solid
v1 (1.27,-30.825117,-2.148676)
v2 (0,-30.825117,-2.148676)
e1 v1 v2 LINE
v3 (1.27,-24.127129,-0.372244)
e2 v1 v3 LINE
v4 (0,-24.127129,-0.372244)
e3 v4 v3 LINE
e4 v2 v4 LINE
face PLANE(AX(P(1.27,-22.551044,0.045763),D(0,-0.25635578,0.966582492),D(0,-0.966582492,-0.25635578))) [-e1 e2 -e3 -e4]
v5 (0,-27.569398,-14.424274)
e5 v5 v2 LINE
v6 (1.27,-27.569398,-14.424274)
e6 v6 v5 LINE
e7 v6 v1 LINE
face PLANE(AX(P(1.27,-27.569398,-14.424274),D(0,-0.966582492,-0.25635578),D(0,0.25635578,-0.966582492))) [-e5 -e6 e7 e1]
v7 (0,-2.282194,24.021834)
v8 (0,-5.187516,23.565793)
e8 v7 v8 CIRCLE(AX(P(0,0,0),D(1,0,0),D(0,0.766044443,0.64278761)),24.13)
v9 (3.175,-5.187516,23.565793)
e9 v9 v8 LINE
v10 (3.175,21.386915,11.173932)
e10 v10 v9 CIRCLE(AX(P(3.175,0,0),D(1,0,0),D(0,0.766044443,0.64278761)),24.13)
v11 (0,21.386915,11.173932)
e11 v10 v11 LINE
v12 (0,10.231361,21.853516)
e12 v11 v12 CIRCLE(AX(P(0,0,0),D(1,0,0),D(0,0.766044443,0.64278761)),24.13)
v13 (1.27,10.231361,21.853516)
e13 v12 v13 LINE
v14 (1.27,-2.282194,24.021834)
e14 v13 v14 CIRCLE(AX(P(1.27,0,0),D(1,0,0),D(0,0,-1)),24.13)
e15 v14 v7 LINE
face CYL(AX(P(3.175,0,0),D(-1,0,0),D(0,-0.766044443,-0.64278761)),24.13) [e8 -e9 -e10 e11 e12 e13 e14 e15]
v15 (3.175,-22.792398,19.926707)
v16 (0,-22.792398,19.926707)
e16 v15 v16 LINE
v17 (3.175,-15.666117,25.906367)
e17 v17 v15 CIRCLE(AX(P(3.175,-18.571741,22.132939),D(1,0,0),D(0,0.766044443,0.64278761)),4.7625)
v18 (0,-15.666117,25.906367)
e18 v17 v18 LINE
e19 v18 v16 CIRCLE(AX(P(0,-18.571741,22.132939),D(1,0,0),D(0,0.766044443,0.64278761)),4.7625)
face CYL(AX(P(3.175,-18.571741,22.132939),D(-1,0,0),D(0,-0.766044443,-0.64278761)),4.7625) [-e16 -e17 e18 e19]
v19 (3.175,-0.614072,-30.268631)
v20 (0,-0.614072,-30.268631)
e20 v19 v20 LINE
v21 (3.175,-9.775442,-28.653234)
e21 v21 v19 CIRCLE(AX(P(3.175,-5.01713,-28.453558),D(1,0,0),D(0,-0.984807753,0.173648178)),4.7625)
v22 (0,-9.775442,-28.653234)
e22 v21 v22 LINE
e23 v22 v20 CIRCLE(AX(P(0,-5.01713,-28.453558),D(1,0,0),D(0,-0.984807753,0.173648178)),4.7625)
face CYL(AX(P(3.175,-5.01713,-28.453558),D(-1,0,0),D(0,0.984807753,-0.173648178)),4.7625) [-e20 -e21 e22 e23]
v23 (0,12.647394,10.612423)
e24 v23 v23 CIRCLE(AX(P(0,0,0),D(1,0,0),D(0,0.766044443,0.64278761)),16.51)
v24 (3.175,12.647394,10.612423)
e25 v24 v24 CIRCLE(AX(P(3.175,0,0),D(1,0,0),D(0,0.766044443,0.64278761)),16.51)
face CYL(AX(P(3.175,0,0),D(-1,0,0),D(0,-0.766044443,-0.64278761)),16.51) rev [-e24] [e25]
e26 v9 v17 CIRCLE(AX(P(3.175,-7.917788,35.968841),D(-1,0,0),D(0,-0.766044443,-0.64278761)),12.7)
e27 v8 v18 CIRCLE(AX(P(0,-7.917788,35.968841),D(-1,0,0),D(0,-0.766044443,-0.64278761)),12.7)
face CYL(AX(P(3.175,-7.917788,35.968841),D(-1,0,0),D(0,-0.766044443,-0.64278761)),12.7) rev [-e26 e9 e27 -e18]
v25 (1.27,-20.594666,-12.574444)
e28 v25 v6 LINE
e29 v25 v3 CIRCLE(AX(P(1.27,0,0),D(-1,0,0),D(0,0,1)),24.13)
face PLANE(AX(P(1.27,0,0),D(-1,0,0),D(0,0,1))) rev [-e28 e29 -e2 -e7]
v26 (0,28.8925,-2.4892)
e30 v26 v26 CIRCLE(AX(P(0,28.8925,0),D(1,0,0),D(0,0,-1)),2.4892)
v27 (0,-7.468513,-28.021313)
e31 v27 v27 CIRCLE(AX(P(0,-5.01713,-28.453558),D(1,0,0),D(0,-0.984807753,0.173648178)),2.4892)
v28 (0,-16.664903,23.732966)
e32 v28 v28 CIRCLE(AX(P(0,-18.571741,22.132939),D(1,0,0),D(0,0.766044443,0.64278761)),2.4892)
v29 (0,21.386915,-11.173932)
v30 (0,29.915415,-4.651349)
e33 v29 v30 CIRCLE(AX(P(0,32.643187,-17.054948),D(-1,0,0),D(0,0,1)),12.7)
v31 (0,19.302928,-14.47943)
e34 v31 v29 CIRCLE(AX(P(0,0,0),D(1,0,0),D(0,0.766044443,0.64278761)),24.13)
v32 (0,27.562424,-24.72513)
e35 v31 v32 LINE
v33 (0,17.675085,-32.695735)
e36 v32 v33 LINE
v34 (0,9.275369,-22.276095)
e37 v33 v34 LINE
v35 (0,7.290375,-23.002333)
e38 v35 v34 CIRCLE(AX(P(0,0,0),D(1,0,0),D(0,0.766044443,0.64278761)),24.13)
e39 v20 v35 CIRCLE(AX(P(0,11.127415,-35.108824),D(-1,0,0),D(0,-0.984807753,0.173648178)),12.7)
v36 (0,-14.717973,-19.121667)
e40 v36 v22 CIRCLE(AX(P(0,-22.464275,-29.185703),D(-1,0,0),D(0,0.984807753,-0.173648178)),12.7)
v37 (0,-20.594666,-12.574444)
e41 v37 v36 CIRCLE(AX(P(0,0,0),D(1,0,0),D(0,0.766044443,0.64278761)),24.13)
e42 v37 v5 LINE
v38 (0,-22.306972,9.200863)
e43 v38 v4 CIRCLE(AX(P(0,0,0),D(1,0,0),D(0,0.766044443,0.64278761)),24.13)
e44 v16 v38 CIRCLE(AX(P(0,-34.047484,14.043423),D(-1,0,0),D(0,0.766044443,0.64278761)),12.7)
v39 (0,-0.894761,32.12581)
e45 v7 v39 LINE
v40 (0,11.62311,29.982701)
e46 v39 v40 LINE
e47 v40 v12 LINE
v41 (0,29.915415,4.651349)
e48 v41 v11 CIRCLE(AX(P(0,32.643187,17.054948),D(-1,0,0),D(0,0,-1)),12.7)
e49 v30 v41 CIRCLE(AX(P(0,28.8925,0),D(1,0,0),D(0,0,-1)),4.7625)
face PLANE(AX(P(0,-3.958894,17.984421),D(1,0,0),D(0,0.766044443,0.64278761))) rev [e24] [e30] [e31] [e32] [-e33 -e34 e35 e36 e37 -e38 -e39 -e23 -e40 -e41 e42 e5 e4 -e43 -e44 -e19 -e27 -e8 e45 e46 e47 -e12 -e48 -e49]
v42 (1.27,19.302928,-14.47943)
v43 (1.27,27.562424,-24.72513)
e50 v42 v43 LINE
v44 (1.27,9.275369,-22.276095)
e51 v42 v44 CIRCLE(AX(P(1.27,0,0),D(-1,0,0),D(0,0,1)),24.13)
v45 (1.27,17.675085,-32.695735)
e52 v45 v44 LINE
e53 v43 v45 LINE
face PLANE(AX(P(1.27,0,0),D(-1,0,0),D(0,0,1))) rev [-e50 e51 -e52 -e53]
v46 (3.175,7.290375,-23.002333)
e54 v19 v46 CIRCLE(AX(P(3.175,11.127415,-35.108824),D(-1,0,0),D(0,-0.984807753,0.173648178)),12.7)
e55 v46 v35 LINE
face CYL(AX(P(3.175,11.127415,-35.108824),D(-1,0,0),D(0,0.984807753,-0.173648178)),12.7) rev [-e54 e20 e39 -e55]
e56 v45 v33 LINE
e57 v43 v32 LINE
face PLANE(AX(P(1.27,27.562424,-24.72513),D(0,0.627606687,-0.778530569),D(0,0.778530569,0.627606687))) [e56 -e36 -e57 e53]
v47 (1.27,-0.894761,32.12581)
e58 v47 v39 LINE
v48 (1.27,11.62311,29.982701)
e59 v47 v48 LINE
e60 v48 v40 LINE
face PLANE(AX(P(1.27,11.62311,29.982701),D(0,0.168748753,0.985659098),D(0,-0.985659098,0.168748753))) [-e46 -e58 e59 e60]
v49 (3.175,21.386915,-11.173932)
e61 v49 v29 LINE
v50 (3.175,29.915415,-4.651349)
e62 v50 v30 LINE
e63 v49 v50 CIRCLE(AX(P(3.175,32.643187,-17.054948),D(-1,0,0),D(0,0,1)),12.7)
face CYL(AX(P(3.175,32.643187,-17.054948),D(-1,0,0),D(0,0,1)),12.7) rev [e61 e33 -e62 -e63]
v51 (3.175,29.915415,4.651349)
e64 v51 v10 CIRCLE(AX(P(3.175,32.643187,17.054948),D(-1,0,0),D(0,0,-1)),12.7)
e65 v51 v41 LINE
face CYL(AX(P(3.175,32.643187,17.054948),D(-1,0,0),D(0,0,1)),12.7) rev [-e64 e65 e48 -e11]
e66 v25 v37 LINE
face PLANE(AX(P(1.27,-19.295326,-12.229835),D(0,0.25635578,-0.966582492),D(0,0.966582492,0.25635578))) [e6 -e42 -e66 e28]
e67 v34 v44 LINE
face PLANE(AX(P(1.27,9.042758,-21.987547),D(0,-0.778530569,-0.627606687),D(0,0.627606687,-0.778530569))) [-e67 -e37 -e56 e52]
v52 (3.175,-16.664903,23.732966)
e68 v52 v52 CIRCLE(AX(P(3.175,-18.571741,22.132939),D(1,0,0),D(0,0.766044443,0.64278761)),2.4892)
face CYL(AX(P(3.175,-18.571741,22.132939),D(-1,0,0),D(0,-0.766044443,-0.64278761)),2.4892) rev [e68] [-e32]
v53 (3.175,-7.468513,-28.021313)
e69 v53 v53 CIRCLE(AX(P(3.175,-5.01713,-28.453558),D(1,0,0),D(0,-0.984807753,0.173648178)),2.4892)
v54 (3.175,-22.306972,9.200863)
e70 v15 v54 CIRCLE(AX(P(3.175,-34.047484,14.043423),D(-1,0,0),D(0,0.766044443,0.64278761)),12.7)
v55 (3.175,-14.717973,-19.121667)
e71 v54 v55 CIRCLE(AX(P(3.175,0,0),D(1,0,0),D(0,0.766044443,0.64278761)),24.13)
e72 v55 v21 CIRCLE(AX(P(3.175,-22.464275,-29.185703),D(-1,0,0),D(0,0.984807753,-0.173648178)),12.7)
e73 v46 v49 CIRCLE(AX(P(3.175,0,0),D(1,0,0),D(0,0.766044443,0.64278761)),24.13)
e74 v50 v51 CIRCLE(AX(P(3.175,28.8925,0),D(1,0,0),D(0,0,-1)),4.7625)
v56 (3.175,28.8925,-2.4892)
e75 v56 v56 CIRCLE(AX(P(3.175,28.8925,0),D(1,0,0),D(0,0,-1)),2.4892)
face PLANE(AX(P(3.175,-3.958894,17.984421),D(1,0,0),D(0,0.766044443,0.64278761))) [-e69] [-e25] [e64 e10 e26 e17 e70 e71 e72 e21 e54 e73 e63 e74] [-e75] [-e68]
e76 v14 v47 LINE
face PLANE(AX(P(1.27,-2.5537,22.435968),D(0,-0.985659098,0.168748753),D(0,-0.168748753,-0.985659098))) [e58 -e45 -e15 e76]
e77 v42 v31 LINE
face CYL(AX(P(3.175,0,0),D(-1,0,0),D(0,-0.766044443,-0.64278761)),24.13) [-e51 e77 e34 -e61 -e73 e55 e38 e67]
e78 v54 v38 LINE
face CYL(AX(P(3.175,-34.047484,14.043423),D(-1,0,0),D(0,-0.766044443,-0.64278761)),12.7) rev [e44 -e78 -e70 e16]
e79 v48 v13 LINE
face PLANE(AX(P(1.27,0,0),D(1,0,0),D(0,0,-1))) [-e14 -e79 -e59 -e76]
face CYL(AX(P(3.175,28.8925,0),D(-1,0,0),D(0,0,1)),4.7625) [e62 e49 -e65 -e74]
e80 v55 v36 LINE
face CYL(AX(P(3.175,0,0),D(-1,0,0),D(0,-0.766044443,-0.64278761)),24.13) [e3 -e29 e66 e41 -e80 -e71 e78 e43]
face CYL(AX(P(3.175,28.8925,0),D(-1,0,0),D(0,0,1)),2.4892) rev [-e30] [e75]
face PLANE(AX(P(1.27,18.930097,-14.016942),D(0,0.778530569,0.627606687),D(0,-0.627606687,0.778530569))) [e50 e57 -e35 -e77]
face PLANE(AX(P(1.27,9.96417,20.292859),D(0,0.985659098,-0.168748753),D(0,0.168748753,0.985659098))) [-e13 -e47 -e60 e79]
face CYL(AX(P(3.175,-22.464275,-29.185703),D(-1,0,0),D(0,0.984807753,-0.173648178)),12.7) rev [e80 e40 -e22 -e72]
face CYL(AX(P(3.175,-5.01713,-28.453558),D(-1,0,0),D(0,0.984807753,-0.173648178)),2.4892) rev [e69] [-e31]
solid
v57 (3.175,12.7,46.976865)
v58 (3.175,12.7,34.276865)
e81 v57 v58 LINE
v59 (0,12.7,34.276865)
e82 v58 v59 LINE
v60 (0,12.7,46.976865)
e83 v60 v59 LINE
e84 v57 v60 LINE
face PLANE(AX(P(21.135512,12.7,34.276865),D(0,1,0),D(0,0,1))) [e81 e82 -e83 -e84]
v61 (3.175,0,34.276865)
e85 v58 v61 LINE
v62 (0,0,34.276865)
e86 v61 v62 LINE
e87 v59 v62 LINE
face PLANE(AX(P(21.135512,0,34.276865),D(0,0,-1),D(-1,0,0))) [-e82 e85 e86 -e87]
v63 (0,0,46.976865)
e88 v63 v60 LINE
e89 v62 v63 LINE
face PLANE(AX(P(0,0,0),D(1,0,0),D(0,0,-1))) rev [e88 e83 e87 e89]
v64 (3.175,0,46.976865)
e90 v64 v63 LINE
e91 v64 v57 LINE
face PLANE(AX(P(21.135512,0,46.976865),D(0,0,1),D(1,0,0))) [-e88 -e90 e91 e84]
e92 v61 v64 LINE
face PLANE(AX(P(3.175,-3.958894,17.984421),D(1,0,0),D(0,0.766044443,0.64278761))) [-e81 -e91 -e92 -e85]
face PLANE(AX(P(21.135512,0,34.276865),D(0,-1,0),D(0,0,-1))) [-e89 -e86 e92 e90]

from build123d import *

# Parameters (mm, degrees)
SKETCH1_R           = 16.51
SKETCH1_R_2         = 2.4892
BOSS_EXTRUDE1_DEPTH = 3.175
CIRPATTERN1_COUNT   = 3
CIRPATTERN1_ANGLE   = 260
SKETCH2_W           = 12.7
SKETCH2_H           = 12.7
BOSS_EXTRUDE2_DEPTH = 3.175
BOSS_EXTRUDE3_DEPTH = 1.27


with BuildPart() as part:
    # Sketch1 → Boss-Extrude1 (new body)
    with BuildSketch(Plane(origin=(0, 0, 0), x_dir=(0, 0, -1), z_dir=(1, 0, 0))):
        with BuildLine():
            ThreePointArc((4.651349482, 29.915414585), (0, 33.655), (-4.651349482, 29.915414585))
            ThreePointArc((-4.651349482, 29.915414585), (-6.967053747, 24.927981855), (-11.173931514, 21.386915498))
            ThreePointArc((-11.173931514, 21.386915498), (0, -24.13), (11.173931514, 21.386915498))
            ThreePointArc((11.173931514, 21.386915498), (6.967053747, 24.927981855), (4.651349482, 29.915414585))
        make_face()
        Circle(SKETCH1_R, mode=Mode.SUBTRACT)
        with Locations((0, 28.8925)):
            Circle(SKETCH1_R_2, mode=Mode.SUBTRACT)
    extrude(amount=BOSS_EXTRUDE1_DEPTH)


with BuildPart() as cirpattern1_1:
    # CirPattern1: pattern copy
    add(part.part.rotate(Axis((0, 0, 0), (1, 0, 0)), 1 * CIRPATTERN1_ANGLE / (CIRPATTERN1_COUNT - 1)))


with BuildPart() as cirpattern1_2:
    # CirPattern1: pattern copy
    add(part.part.rotate(Axis((0, 0, 0), (1, 0, 0)), 2 * CIRPATTERN1_ANGLE / (CIRPATTERN1_COUNT - 1)))


with BuildPart() as part_1:
    add(part.part)

    # Combine1: read off the stored shape, not the designer's step
    # Combine1: union CirPattern1_2, CirPattern1_1
    add(cirpattern1_2.part)
    add(cirpattern1_1.part)

    # Sketch3 → Boss-Extrude3 (add)
    with BuildSketch(Plane.ZY):
        Polygon((-14.016942068, 18.930096526), (-21.987546991, 9.042758303), (-32.695735298, 17.675085478), (-24.725130374, 27.562423702), align=None)
        Polygon((20.292858755, 9.964170469), (22.435967923, -2.55370008), (32.12580998, -0.894760626), (29.982700812, 11.623109924), align=None)
        Polygon((-12.229834857, -19.295325852), (0.045762794, -22.551044254), (-2.148676213, -30.82511682), (-14.424273863, -27.569398418), align=None)
    extrude(amount=-BOSS_EXTRUDE3_DEPTH)


with BuildPart() as body_2:
    # Sketch2 → Boss-Extrude2 (new body)
    with BuildSketch(Plane.ZY):
        with Locations((40.626865076, 6.35)):
            Rectangle(SKETCH2_W, SKETCH2_H)
    extrude(amount=-BOSS_EXTRUDE2_DEPTH)


solid = Compound([part_1.part, body_2.part])
